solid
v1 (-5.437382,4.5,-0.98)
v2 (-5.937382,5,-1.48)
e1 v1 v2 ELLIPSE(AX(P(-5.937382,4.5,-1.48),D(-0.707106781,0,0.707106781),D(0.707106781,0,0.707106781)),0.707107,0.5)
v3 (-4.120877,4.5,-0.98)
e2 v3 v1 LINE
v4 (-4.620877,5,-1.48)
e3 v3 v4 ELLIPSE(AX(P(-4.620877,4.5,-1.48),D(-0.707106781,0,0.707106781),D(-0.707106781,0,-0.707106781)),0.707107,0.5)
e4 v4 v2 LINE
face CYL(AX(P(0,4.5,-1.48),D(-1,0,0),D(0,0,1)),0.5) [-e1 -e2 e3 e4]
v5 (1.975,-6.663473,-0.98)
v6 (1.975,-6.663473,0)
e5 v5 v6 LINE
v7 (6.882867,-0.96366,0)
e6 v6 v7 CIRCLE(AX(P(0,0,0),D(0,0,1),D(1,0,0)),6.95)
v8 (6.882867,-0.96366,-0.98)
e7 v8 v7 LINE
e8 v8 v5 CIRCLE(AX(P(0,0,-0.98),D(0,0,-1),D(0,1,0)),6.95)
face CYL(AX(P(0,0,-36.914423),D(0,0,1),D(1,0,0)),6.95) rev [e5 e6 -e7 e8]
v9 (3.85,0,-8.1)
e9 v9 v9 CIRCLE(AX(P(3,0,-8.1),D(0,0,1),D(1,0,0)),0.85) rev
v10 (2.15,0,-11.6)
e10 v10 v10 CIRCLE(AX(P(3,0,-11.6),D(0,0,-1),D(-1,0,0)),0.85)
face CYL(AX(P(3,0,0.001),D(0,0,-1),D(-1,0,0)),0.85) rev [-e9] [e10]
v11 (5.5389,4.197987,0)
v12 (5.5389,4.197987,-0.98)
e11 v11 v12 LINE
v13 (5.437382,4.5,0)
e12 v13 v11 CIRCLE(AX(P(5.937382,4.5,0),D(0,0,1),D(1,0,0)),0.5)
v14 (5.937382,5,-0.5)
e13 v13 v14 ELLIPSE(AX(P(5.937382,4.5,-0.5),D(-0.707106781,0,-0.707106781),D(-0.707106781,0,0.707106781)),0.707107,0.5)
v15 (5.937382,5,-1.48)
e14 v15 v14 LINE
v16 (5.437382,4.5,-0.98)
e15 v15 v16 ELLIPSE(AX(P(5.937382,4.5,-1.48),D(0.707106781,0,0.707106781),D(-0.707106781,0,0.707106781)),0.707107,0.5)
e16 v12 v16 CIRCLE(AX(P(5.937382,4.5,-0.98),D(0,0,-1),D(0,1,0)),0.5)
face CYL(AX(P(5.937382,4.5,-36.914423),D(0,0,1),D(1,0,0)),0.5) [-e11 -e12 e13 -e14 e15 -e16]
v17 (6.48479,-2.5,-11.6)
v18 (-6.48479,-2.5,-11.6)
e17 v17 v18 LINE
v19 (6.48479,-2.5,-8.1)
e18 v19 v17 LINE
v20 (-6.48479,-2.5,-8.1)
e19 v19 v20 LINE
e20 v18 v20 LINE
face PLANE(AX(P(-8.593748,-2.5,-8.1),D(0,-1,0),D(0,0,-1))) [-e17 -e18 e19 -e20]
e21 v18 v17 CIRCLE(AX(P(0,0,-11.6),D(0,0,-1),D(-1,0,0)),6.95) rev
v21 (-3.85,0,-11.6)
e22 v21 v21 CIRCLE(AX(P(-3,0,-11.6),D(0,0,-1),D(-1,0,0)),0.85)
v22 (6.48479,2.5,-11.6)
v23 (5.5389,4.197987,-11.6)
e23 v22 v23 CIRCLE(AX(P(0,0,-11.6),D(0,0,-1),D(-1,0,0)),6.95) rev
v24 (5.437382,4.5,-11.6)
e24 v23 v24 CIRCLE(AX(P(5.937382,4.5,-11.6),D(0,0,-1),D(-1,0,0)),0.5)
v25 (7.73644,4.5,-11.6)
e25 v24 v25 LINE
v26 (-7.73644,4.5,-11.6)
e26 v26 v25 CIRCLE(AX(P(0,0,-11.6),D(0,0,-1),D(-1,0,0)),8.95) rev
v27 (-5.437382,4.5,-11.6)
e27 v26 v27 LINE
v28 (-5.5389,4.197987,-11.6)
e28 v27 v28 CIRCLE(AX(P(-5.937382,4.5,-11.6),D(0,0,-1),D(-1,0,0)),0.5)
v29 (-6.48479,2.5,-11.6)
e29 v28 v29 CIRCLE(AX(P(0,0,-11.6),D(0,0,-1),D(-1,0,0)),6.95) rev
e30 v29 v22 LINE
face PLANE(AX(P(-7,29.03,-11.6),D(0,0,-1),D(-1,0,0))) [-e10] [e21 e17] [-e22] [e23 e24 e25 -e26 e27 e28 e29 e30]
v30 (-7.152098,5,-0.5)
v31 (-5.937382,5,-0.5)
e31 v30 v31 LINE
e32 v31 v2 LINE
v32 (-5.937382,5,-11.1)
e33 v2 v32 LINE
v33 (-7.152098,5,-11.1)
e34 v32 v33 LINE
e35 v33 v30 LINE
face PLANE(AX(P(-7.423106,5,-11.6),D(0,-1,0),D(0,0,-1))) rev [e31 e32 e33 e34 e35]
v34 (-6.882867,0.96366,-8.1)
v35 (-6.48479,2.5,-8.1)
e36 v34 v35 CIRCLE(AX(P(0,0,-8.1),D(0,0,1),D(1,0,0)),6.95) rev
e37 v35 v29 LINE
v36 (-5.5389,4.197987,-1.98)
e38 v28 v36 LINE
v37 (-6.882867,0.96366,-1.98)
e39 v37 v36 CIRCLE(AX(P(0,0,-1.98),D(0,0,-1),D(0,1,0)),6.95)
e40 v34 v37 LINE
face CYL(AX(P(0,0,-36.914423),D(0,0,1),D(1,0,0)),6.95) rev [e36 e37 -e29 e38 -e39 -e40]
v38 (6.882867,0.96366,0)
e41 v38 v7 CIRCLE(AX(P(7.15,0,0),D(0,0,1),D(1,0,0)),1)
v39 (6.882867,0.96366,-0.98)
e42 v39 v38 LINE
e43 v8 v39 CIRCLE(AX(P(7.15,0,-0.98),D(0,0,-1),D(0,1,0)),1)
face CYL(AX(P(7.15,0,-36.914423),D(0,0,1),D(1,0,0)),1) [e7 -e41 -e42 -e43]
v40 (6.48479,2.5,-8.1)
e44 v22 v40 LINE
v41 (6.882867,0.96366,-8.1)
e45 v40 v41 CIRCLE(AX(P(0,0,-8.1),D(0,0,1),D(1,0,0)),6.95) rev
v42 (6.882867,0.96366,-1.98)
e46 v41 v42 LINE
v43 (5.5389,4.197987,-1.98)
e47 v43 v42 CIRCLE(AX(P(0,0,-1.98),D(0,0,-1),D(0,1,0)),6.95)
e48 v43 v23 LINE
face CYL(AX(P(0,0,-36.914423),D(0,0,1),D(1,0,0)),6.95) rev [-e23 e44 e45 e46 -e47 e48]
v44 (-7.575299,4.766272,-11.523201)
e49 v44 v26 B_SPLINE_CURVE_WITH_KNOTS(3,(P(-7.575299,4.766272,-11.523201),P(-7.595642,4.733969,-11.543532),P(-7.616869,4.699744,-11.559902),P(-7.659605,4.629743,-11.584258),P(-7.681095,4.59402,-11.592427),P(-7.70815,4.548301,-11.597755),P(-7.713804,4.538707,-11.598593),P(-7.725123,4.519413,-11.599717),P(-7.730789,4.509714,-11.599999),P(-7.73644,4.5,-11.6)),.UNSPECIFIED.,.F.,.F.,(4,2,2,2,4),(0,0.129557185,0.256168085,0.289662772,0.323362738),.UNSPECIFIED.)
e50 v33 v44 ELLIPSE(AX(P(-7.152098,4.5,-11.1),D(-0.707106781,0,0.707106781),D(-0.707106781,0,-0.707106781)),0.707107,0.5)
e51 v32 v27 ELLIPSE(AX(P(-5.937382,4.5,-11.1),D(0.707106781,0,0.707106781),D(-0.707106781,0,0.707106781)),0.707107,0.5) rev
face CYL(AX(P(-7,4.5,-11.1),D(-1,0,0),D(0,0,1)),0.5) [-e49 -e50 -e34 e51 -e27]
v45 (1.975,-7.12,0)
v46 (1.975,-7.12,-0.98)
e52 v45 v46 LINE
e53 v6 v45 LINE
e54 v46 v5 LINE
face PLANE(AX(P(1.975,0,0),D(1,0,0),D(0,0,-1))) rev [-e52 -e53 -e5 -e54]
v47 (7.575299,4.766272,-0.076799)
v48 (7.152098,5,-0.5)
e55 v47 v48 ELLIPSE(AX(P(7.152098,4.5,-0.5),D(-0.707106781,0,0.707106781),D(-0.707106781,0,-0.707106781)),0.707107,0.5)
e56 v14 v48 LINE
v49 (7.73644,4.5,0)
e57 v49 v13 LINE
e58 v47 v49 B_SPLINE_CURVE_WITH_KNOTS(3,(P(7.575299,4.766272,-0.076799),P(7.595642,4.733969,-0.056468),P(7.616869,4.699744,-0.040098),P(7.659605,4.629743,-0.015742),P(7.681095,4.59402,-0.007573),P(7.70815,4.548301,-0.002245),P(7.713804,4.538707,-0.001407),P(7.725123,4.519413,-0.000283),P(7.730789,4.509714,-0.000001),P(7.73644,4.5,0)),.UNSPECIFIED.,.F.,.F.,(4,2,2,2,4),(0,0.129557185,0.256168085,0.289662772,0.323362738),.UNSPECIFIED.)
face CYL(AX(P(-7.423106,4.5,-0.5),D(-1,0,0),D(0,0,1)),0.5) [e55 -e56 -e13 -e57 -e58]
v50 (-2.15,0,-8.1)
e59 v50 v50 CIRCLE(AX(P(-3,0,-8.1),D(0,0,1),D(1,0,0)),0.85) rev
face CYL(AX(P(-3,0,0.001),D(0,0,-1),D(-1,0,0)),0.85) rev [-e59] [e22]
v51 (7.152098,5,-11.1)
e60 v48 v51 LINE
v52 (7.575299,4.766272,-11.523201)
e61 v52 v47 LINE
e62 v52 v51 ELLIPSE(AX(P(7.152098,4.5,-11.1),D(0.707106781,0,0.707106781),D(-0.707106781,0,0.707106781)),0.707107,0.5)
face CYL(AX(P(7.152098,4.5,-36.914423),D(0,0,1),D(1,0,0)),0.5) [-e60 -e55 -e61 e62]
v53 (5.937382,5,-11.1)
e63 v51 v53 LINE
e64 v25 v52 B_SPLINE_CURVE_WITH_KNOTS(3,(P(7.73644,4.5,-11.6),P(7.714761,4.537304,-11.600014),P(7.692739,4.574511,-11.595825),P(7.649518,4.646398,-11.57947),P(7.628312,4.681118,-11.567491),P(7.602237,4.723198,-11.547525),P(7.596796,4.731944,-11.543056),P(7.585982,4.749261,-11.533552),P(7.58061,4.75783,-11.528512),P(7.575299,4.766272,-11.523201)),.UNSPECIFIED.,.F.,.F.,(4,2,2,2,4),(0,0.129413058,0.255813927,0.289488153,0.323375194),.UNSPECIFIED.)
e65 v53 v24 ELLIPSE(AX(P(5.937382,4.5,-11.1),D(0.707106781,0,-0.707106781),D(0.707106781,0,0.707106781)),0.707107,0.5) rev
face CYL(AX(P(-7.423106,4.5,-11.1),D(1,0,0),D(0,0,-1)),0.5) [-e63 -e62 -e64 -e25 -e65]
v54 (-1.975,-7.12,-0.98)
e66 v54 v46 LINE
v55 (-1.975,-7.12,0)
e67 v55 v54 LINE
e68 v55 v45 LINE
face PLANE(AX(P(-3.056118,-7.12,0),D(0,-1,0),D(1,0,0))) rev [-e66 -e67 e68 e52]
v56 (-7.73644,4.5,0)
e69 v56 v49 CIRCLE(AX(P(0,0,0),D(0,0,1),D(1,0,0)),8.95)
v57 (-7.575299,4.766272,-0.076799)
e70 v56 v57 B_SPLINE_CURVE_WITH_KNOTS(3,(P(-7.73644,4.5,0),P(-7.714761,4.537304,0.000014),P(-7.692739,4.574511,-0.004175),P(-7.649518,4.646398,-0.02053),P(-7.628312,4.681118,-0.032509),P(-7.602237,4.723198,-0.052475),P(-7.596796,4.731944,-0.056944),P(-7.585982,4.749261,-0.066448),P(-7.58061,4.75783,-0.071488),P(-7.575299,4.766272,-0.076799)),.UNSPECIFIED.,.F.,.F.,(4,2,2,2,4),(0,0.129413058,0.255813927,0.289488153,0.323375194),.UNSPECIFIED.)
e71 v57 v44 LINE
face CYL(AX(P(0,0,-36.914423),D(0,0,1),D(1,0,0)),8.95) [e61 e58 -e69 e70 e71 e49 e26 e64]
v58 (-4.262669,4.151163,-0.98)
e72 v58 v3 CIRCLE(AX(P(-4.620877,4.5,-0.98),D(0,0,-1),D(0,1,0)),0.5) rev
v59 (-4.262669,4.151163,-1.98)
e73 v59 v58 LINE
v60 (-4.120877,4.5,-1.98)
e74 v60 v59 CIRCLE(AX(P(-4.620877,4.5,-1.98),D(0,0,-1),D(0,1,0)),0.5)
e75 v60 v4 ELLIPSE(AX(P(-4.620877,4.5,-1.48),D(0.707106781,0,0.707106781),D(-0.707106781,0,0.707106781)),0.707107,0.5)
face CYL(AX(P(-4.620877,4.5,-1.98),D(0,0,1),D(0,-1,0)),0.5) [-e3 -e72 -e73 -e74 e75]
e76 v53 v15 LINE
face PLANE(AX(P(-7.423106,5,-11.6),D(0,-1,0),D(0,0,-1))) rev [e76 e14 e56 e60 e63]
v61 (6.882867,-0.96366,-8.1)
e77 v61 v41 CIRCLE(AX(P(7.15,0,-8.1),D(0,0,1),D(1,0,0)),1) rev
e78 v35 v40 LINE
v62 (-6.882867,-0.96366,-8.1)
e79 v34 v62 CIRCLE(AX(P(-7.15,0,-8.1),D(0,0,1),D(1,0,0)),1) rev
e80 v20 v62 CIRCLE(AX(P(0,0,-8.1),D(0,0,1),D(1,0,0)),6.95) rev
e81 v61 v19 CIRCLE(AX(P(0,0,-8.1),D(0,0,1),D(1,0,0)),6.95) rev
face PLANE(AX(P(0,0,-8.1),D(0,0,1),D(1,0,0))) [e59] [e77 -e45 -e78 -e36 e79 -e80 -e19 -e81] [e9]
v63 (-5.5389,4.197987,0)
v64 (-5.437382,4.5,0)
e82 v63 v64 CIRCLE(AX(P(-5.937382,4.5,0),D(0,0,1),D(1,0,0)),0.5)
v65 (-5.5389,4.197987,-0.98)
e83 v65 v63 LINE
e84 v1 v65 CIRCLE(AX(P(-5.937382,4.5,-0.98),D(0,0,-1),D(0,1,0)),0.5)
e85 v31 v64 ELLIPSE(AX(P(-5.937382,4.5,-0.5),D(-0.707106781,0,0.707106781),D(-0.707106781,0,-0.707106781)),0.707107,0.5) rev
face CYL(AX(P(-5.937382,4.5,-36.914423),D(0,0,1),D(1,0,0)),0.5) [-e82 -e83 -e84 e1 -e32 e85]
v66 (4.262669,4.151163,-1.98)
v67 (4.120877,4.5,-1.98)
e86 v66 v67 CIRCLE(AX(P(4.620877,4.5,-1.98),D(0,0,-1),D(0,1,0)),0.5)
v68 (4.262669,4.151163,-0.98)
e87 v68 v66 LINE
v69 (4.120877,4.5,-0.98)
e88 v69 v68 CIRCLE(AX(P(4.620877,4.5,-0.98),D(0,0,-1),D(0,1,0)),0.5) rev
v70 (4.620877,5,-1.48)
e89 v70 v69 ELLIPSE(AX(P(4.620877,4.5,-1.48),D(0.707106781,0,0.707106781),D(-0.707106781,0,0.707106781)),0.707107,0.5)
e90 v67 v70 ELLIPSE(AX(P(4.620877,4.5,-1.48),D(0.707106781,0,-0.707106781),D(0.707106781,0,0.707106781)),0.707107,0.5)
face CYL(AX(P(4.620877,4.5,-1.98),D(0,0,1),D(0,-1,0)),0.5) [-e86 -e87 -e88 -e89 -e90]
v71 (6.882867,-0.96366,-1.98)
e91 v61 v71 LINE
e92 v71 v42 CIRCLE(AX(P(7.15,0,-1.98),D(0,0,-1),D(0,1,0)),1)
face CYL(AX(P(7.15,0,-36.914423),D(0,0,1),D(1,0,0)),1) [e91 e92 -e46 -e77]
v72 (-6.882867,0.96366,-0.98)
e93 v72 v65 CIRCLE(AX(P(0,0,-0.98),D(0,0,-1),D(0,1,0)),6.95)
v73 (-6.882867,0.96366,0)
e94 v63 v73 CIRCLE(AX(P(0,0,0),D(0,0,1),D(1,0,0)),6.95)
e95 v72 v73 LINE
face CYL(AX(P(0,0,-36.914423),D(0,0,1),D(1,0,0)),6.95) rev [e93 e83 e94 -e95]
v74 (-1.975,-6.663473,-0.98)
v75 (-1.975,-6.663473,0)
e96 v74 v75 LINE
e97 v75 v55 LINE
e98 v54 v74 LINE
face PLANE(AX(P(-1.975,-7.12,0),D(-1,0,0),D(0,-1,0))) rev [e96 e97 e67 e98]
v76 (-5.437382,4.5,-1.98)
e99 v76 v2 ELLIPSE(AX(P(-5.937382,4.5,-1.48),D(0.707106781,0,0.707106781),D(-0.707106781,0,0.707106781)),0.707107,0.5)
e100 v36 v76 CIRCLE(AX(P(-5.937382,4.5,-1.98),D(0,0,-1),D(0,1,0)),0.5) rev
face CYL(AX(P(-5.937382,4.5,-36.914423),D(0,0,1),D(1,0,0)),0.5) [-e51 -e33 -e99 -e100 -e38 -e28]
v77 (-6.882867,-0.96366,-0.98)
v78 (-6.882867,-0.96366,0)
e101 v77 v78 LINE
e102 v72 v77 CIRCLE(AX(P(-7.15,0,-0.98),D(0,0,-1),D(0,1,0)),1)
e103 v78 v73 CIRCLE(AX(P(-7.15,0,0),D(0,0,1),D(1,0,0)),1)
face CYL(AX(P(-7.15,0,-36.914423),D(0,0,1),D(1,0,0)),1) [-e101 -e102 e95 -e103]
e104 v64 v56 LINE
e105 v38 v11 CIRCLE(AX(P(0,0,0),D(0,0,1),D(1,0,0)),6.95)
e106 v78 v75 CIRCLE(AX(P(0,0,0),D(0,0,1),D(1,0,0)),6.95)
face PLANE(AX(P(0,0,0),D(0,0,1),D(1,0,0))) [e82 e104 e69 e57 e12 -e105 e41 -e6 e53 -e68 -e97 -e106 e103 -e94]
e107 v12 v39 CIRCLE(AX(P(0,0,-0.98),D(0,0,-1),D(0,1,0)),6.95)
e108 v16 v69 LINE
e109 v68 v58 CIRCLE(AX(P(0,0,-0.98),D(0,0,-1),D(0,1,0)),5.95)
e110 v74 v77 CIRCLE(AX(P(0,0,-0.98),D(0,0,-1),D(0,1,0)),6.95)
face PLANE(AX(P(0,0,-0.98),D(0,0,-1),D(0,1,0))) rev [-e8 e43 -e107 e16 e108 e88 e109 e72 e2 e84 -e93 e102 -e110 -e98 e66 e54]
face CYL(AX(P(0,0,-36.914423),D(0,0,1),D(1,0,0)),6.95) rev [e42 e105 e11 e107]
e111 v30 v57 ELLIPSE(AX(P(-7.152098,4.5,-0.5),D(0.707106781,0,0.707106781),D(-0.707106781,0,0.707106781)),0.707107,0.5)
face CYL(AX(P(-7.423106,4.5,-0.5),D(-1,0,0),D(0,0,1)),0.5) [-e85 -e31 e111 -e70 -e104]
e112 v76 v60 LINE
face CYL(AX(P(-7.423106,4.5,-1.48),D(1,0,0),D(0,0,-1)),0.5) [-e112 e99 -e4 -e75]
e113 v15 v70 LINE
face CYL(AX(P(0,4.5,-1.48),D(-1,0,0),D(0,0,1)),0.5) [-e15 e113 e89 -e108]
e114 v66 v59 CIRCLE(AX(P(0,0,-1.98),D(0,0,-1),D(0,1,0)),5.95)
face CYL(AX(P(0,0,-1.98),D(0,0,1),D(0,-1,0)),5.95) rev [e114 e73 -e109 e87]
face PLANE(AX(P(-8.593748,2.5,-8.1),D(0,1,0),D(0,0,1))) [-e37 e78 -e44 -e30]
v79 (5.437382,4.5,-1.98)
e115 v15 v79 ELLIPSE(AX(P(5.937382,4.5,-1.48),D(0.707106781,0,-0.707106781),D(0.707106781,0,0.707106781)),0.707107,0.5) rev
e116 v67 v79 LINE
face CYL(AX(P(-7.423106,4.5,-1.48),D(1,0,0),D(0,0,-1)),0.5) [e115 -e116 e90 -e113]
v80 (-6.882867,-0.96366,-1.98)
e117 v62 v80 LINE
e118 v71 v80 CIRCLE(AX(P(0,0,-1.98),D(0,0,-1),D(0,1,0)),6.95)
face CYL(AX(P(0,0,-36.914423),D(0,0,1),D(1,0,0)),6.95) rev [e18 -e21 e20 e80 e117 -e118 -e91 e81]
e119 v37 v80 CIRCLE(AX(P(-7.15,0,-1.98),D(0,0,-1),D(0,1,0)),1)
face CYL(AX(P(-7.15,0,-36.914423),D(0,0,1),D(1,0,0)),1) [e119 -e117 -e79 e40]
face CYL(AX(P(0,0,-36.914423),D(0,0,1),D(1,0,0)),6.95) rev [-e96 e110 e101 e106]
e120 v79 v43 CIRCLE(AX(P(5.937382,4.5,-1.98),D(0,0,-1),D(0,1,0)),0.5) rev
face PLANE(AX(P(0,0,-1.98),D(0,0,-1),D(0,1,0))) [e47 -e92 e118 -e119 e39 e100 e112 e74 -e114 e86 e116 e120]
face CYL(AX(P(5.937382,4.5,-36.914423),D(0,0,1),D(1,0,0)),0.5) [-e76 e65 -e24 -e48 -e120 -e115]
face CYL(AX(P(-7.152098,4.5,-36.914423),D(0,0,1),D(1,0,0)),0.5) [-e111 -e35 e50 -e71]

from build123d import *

# Parameters (mm, degrees)
SKETCH_3_R          = 6.95
SKETCH_3_R_2        = 5.95
EXTRUDE_3_DEPTH     = 1
SKETCH_1_R          = 8.95
EXTRUDE_1_DEPTH     = 11.6
CUT_EXTRUDE_1_DEPTH = 18.16872156
FILLET_4_R          = 0.5
SKETCH_5_W          = 17.187495454
SKETCH_5_H          = 5
EXTRUDE_4_DEPTH     = 3.5
SKETCH_6_W          = 0.98
SKETCH_6_H          = 0.456526807
CUT_EXTRUDE_2_DEPTH = 3.95
CUT_EXTRUDE_3_REACH = 19.169
SKETCH_8_R          = 0.85


with BuildPart() as part:
    # 草图3 → 凸台-拉伸3 (new body)
    with BuildSketch(Plane(origin=(0, 0, -0.98), x_dir=(-1, 0, 0), z_dir=(0, 0, -1))):
        with Locations(Location((0, 0, 0), (0, 0, 90))):
            Circle(SKETCH_3_R)
        with Locations(Location((0, 0, 0), (0, 0, 90))):
            Circle(SKETCH_3_R_2, mode=Mode.SUBTRACT)
    extrude(amount=EXTRUDE_3_DEPTH)

    # 草图1 → 凸台-拉伸1 (add)
    with BuildSketch(Plane.XY):
        Circle(SKETCH_1_R)
        with BuildLine():
            ThreePointArc((1.975, 6.663473193), (-3.760818846, 5.844548024), (-6.882867133, 0.963659707))
            ThreePointArc((-6.882867133, 0.963659707), (-6.15, 0), (-6.882867133, -0.963659707))
            ThreePointArc((-6.882867133, -0.963659707), (-3.760818846, -5.844548024), (1.975, -6.663473193))
            ThreePointArc((1.975, -6.663473193), (5.266632793, -4.53487365), (6.882867133, -0.963659707))
            ThreePointArc((6.882867133, -0.963659707), (6.15, 0), (6.882867133, 0.963659707))
            ThreePointArc((6.882867133, 0.963659707), (5.266632793, 4.53487365), (1.975, 6.663473193))
        make_face(mode=Mode.SUBTRACT)
    extrude(amount=-EXTRUDE_1_DEPTH)

    # 草图4 → 切除-拉伸1 (cut, through all)
    with BuildSketch(Plane.XY):
        with BuildLine():
            Line((-7.423105819, 5), (7.423105819, 5))
            ThreePointArc((7.423105819, 5), (0, 8.95), (-7.423105819, 5))
        make_face()
    extrude(amount=-CUT_EXTRUDE_1_DEPTH, mode=Mode.SUBTRACT)

    # 圆角4
    fillet_4_edges = [part.edges().sort_by_distance(p)[0] for p in [
        (6.125186063, 5, -11.6),
        (-6.125186063, 5, 0),
        (6.125186063, 5, 0),
        (4.827266307, 5, -0.49),
        (4.026278496, 5, -0.98),
        (4.827266307, 5, -6.79),
        (7.423105819, 5, -5.8),
        (-4.026278496, 5, -0.98),
        (-4.827266307, 5, -0.49),
        (-6.125186063, 5, -11.6),
        (-4.827266307, 5, -6.79),
        (-7.423105819, 5, -5.8),
        (-3.225290685, 5, -1.48),
        (-4.026278496, 5, -1.98),
        (4.026278496, 5, -1.98),
        (3.225290685, 5, -1.48),
    ]]
    fillet(fillet_4_edges, radius=FILLET_4_R - 0.0001)  # a hair under: the kernel refuses the full size

    # 草图5 → 凸台-拉伸4 (add)
    with BuildSketch(Plane(origin=(0, 0, -11.6), x_dir=(-1, 0, 0), z_dir=(0, 0, -1))):
        Rectangle(SKETCH_5_W, SKETCH_5_H)
    extrude(amount=-EXTRUDE_4_DEPTH)

    # 草图6 → 切除-拉伸2 (cut)
    with BuildSketch(Plane(origin=(1.975, 0, 0), x_dir=(0, 0, -1), z_dir=(1, 0, 0))):
        with Locations((0.49, -6.891736597)):
            Rectangle(SKETCH_6_W, SKETCH_6_H)
    extrude(amount=-CUT_EXTRUDE_2_DEPTH, mode=Mode.SUBTRACT)

    # 草图8 → 切除-拉伸3 (cut, up to next)
    with BuildSketch(Plane(origin=(0, 0, -11.6), x_dir=(-1, 0, 0), z_dir=(0, 0, -1)), mode=Mode.PRIVATE) as cut_extrude_3_sk1:
        with Locations((-3, 0)):
            Circle(SKETCH_8_R)
    cut_extrude_3_tool1 = extrude(cut_extrude_3_sk1.sketch, amount=-CUT_EXTRUDE_3_REACH, mode=Mode.PRIVATE) & part.part
    # 草图8 → 切除-拉伸3 (cut, up to next)
    with BuildSketch(Plane(origin=(0, 0, -11.6), x_dir=(-1, 0, 0), z_dir=(0, 0, -1)), mode=Mode.PRIVATE) as cut_extrude_3_sk2:
        with Locations((3, 0)):
            Circle(SKETCH_8_R)
    cut_extrude_3_tool2 = extrude(cut_extrude_3_sk2.sketch, amount=-CUT_EXTRUDE_3_REACH, mode=Mode.PRIVATE) & part.part
    add(cut_extrude_3_tool1.solids().sort_by_distance((3, 0, -11.6))[0], mode=Mode.SUBTRACT)
    add(cut_extrude_3_tool2.solids().sort_by_distance((-3, 0, -11.6))[0], mode=Mode.SUBTRACT)


solid = part.part
